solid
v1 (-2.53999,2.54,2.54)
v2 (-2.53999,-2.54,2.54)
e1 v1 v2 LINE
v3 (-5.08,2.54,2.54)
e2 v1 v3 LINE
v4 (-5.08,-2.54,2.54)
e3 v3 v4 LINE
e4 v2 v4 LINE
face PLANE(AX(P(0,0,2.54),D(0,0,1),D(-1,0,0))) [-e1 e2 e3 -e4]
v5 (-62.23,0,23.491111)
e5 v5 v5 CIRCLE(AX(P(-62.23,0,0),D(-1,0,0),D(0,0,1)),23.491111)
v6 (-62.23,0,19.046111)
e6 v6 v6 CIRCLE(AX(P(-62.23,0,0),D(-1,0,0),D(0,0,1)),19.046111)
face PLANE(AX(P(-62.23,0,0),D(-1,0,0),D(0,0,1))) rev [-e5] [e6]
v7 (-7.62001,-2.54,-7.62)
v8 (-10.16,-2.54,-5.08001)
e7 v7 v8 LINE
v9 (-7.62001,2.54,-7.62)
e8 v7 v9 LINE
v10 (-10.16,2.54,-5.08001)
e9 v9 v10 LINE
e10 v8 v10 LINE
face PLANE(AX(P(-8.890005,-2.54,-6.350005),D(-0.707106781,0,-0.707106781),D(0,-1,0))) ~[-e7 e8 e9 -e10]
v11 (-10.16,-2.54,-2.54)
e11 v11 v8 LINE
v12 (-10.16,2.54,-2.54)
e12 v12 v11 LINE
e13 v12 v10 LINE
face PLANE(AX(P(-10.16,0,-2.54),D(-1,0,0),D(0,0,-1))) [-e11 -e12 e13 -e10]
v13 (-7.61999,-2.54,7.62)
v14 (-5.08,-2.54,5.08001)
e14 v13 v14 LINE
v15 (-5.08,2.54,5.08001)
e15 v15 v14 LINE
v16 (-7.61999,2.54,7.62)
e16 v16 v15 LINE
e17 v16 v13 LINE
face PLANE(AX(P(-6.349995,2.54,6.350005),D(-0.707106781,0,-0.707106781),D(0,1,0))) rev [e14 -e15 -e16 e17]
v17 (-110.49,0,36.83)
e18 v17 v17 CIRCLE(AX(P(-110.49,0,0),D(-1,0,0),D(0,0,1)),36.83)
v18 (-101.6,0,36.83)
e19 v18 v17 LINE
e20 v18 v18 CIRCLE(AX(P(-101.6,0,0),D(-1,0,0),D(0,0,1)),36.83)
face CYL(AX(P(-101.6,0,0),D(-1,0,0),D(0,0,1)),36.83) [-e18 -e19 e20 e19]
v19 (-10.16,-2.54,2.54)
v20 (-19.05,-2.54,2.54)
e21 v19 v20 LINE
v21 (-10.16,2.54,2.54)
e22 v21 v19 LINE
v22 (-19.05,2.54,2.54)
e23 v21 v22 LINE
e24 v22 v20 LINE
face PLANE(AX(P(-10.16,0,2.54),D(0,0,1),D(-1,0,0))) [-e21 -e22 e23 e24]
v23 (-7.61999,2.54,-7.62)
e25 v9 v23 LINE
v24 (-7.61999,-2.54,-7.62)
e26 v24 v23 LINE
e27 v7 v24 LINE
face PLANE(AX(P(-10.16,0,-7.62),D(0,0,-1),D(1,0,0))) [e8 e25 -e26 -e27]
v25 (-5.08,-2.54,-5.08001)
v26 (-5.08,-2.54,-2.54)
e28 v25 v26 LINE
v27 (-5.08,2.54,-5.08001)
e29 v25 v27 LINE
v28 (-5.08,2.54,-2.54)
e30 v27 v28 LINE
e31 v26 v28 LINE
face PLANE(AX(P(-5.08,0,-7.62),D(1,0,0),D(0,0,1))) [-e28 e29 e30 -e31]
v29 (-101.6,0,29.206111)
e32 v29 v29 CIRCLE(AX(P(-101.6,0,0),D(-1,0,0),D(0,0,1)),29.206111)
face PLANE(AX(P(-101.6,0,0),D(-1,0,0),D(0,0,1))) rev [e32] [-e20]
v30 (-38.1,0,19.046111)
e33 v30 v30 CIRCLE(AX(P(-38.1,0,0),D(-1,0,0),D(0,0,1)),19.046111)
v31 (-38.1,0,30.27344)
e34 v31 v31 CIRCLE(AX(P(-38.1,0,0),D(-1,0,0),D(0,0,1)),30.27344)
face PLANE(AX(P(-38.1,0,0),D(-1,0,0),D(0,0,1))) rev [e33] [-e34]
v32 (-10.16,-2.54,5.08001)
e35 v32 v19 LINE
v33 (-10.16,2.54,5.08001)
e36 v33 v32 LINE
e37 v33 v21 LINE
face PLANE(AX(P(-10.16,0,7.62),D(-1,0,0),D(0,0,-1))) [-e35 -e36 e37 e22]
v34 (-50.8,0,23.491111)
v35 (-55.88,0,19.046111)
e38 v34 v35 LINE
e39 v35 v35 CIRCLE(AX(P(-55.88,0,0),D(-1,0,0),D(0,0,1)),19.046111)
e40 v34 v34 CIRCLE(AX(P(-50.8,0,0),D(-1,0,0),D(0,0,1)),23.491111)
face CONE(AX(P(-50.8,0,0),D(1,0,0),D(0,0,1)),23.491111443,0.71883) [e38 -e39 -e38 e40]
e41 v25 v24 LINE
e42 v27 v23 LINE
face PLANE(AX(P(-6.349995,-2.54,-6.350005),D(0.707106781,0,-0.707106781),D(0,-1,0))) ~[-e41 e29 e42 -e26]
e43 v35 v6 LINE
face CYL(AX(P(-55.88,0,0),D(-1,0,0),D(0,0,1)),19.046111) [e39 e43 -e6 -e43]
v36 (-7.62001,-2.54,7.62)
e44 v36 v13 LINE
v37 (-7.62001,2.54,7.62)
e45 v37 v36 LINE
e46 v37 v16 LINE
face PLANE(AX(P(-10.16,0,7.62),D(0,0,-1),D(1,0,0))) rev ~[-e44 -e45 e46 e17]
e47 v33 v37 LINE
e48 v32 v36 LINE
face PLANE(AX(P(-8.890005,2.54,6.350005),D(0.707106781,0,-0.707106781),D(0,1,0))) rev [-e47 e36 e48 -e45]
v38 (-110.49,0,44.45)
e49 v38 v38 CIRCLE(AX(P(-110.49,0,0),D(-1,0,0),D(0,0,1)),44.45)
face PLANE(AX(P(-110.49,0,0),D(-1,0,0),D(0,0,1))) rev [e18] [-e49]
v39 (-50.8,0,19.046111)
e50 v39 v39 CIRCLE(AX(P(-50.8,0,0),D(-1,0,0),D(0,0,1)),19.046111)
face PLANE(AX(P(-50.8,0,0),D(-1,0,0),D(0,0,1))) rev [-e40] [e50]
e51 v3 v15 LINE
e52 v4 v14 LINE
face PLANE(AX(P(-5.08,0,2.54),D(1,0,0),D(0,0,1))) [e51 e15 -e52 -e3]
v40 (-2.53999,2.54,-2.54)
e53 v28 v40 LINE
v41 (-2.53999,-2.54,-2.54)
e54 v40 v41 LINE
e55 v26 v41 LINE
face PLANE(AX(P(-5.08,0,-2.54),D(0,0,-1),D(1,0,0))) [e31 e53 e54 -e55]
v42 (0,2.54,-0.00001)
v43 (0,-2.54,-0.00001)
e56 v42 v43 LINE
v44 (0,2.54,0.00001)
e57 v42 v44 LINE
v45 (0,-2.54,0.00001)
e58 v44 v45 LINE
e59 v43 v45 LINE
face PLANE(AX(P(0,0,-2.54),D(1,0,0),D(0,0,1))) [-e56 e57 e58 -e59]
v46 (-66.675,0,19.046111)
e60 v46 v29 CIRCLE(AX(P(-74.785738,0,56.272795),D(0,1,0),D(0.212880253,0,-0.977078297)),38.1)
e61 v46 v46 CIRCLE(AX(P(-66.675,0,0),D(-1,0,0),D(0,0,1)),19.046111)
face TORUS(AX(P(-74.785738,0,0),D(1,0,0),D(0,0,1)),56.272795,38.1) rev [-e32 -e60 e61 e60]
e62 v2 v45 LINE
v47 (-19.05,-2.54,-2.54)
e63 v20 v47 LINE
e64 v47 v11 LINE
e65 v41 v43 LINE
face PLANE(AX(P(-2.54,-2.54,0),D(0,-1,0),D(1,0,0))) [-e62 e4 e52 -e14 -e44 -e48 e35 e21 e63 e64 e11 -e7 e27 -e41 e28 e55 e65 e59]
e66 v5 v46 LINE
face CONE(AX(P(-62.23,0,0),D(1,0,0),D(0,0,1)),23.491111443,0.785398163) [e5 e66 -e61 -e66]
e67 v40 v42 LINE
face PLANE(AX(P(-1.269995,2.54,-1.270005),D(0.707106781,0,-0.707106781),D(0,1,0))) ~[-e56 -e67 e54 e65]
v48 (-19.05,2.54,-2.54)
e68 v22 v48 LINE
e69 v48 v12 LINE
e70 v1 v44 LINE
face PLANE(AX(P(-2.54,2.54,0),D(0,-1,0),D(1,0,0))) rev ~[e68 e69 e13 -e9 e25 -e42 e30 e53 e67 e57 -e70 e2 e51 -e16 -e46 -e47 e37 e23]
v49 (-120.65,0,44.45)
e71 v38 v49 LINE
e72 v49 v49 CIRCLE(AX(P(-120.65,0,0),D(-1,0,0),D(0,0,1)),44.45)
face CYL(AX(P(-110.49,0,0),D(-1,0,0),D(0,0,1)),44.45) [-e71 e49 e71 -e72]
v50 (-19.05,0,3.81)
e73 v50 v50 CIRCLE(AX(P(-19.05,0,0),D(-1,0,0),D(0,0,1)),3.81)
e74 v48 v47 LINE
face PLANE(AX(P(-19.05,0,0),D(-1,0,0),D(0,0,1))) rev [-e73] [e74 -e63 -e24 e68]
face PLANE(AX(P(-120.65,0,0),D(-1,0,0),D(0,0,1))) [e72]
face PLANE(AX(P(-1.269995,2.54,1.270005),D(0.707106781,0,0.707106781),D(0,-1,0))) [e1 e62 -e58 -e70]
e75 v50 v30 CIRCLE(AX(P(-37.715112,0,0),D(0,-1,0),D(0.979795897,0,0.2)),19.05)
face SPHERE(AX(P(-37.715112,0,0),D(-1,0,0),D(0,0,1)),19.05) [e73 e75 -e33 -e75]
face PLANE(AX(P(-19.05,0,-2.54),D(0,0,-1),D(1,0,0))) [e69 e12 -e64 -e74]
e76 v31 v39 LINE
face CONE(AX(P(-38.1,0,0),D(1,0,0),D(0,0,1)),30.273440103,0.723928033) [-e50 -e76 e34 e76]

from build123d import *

# Parameters (mm, degrees)
F0_W          = 5.08
F0_H          = 5.08
F2_DEPTH      = 2.54
F2_DEPTH_BACK = 2.54
F3_SIZE2      = 2.53999
F3_SIZE       = 2.53999


# Not quite as in the source:
# - a fillet or chamfer is up to 0.001 mm smaller than in the source, because OpenCascade refuses the exact size


with BuildPart() as f1:
    # F0 (on Front) → F1 (revolve)
    with BuildSketch(Plane.XZ):
        with BuildLine():
            Line((-120.65, 0), (-19.05, 0))
            Line((-19.05, 0), (-19.05, 2.54))
            Line((-19.05, 2.54), (-19.05, 3.81))
            ThreePointArc((-19.05, 3.81), (-25.8165229562, 14.8770320486), (-38.1, 19.0461114431))
            Line((-38.1, 19.0461114431), (-38.1, 30.2734401025))
            Line((-38.1, 30.2734401025), (-50.8, 19.0461114431))
            Line((-50.8, 19.0461114431), (-50.8, 23.4911114431))
            Line((-50.8, 23.4911114431), (-55.88, 19.0461114431))
            Line((-55.88, 19.0461114431), (-62.23, 19.0461114431))
            Line((-62.23, 19.0461114431), (-62.23, 23.4911114431))
            Line((-62.23, 23.4911114431), (-66.675, 19.0461114431))
            ThreePointArc((-66.675, 19.0461114431), (-85.4281931482, 19.6893537461), (-101.6, 29.2061114431))
            Line((-101.6, 29.2061114431), (-101.6, 36.83))
            Line((-101.6, 36.83), (-110.49, 36.83))
            Line((-110.49, 36.83), (-110.49, 44.45))
            Line((-110.49, 44.45), (-120.65, 44.45))
            Line((-120.65, 44.45), (-120.65, 0))
        make_face()
    revolve(axis=Axis((-69.85, 0, 0), (-1, 0, 0)))

    # F0 (on Front) → F2 (join, two sides)
    with BuildSketch(Plane.XZ) as f2_sk:
        with Locations((-2.54, 0)):
            Rectangle(F0_W, F0_H)
        with Locations((-7.62, -5.08)):
            Rectangle(F0_W, F0_H)
        with Locations((-7.62, 0)):
            Rectangle(F0_W, F0_H)
        with Locations((-7.62, 5.08)):
            Rectangle(F0_W, F0_H)
        Polygon((-19.05, 2.54), (-19.05, 0), (-19.05, -2.54), (-10.16, -2.54), (-10.16, 2.54), align=None)
    extrude(amount=F2_DEPTH)
    extrude(f2_sk.sketch, amount=-F2_DEPTH_BACK)

    # F3 (size 2.54 and 2.54 in the source; OpenCascade refuses exactly that, so slightly less here)
    f3_edges = [f1.edges().sort_by_distance(p)[0] for p in [
        (-10.16, 0, 7.62),
        (-5.08, 0, 7.62),
        (0, 0, 2.54),
        (0, 0, -2.54),
        (-5.08, 0, -7.62),
        (-10.16, 0, -7.62),
    ]]
    chamfer(f3_edges, length=F3_SIZE, length2=F3_SIZE2)


solid = f1.part
